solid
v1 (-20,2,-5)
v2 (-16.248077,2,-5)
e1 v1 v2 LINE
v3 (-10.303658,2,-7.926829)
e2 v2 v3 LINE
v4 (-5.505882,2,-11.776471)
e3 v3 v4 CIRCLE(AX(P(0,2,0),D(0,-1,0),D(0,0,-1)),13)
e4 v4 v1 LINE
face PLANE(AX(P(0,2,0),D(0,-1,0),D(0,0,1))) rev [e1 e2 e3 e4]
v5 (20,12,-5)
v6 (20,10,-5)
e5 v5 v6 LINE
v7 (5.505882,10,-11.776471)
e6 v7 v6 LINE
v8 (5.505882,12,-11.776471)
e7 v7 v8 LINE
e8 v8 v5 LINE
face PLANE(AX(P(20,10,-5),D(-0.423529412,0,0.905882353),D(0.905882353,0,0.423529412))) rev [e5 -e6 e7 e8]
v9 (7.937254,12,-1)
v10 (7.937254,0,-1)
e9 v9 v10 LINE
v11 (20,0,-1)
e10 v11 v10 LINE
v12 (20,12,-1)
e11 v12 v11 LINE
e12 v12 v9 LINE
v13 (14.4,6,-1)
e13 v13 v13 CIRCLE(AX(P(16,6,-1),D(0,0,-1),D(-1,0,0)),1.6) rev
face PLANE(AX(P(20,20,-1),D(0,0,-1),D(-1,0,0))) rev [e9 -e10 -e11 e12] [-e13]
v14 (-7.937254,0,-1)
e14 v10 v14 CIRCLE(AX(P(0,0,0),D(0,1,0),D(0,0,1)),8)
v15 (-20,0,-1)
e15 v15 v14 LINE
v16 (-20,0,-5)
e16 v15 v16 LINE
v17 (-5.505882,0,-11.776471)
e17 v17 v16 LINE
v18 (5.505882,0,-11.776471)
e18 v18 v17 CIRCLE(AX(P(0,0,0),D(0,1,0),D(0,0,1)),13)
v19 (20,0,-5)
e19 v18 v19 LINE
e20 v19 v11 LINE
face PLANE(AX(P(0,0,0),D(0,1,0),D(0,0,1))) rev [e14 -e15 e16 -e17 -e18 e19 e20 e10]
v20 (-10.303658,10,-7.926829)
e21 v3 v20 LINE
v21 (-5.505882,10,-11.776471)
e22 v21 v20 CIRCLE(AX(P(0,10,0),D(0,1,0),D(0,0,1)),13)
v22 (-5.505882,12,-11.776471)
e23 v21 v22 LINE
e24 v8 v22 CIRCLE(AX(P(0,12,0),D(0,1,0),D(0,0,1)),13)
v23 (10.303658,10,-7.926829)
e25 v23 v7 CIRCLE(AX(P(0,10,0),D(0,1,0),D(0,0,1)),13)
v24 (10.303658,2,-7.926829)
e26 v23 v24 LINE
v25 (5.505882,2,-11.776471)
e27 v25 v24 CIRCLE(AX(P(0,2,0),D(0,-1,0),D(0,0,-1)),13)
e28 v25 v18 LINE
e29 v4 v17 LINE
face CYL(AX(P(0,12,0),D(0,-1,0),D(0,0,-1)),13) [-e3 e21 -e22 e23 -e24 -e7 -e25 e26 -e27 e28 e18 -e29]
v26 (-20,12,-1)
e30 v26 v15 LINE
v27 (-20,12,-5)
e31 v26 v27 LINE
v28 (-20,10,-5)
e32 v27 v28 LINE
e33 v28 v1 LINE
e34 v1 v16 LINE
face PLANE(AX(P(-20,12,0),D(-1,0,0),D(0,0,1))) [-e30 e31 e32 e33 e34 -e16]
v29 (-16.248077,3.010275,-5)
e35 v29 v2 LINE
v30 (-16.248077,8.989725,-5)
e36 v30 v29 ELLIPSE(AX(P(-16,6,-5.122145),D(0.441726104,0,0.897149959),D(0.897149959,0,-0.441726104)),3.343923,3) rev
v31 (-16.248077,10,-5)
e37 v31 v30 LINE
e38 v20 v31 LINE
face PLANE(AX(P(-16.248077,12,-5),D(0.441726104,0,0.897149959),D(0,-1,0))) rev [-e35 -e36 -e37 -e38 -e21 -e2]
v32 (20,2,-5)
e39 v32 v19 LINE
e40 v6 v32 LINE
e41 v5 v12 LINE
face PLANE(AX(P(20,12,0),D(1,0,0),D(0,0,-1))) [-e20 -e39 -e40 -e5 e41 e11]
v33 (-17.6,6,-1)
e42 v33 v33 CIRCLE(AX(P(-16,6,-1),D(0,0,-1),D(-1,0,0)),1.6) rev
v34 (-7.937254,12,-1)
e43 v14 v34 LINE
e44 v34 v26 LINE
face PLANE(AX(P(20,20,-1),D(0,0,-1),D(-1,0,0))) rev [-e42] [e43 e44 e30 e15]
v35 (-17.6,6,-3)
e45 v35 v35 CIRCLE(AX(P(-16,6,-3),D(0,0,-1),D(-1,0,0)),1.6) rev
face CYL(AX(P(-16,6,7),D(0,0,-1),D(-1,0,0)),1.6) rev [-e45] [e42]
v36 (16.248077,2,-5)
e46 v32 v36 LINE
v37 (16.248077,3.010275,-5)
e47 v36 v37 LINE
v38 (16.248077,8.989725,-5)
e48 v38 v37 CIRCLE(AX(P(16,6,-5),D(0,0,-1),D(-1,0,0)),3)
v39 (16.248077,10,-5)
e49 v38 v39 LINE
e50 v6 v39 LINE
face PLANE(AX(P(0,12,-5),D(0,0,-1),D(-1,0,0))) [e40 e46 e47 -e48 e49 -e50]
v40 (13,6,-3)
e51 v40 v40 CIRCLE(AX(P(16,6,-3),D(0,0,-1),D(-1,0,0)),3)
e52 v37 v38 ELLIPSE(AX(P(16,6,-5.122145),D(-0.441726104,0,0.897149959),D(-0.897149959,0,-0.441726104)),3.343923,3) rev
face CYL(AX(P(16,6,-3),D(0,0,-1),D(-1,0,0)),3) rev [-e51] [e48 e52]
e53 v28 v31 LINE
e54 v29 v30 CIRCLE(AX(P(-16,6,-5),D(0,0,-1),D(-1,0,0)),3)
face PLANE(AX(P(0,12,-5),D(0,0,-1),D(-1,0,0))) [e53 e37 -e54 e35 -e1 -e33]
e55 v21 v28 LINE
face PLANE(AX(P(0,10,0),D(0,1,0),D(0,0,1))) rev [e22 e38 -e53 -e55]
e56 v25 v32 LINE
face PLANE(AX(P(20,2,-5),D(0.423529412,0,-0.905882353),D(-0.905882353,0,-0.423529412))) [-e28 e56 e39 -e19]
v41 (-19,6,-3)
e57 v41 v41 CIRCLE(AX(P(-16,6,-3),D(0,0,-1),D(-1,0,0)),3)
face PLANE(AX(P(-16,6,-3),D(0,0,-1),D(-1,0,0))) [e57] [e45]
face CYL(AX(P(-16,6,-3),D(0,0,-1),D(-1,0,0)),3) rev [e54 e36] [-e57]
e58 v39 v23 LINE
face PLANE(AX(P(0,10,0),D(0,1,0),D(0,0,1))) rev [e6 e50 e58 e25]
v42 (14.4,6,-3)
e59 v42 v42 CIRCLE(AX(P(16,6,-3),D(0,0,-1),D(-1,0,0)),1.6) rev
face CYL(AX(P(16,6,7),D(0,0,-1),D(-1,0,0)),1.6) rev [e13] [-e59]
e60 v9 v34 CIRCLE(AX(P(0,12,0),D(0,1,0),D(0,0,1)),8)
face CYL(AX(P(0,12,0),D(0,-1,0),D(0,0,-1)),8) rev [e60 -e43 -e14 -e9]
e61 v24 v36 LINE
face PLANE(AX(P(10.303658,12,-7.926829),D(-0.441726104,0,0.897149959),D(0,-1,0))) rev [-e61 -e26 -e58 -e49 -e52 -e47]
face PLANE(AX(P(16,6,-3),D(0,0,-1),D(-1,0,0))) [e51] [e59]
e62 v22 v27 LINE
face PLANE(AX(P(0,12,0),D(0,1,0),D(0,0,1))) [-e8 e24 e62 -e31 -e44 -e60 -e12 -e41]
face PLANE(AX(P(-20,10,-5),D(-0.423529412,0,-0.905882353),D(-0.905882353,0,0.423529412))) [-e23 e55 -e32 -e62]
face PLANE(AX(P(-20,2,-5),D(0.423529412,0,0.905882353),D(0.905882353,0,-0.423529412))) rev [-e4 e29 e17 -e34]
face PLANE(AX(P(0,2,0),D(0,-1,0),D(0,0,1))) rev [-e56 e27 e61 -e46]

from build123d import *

# Parameters (mm, degrees)
BOSS_EXTRUDE1_DEPTH  = 12
SKETCH2_R            = 1.6
CUT_EXTRUDE1_DEPTH   = 12
SKETCH3_R            = 3
CUT_EXTRUDE2_DEPTH   = 2
BOSS_EXTRUDE2_DEPTH  = 2
MIRROR2_COPY_1_DEPTH = 2
SKETCH5_W            = 40
SKETCH5_H            = 1
CUT_EXTRUDE3_DEPTH   = 20


with BuildPart() as part:
    # Sketch1 → Boss-Extrude1 (new body)
    with BuildSketch(Plane(origin=(0, 0, 0), x_dir=(1, 0, 0), z_dir=(0, 1, 0))):
        with BuildLine():
            Line((13, 0), (20, 0))
            Line((20, 0), (20, 5))
            Line((20, 5), (12, 5))
            ThreePointArc((12, 5), (12.747548784, 2.549509757), (13, 0))
        make_face()
        with BuildLine():
            Line((8, 0), (13, 0))
            ThreePointArc((13, 0), (12.747548784, 2.549509757), (12, 5))
            Line((12, 5), (6.244997998, 5))
            ThreePointArc((6.244997998, 5), (7.548509256, 2.649529771), (8, 0))
        make_face()
        with BuildLine():
            ThreePointArc((-12, 5), (-12.747548784, 2.549509757), (-13, 0))
            Line((-13, 0), (-8, 0))
            ThreePointArc((-8, 0), (-7.548509256, 2.649529771), (-6.244997998, 5))
            Line((-6.244997998, 5), (-12, 5))
        make_face()
        with BuildLine():
            Line((6.244997998, 5), (12, 5))
            ThreePointArc((12, 5), (0, 13), (-12, 5))
            Line((-12, 5), (-6.244997998, 5))
            ThreePointArc((-6.244997998, 5), (0, 8), (6.244997998, 5))
        make_face()
        with BuildLine():
            Line((-20, 0), (-13, 0))
            ThreePointArc((-13, 0), (-12.747548784, 2.549509757), (-12, 5))
            Line((-12, 5), (-20, 5))
            Line((-20, 5), (-20, 0))
        make_face()
    extrude(amount=BOSS_EXTRUDE1_DEPTH)

    # Sketch2 → Cut-Extrude1 (cut)
    with BuildSketch(Plane(origin=(0, 0, -5), x_dir=(-1, 0, 0), z_dir=(0, 0, -1))):
        with Locations((16, 6)):
            Circle(SKETCH2_R)
        with Locations((-16, 6)):
            Circle(SKETCH2_R)
    extrude(amount=-CUT_EXTRUDE1_DEPTH, mode=Mode.SUBTRACT)

    # Sketch3 → Cut-Extrude2 (cut)
    with BuildSketch(Plane(origin=(0, 0, -5), x_dir=(-1, 0, 0), z_dir=(0, 0, -1))):
        with Locations((16, 6)):
            Circle(SKETCH3_R)
        with Locations((-16, 6)):
            Circle(SKETCH3_R)
    extrude(amount=-CUT_EXTRUDE2_DEPTH, mode=Mode.SUBTRACT)

    # Sketch4 → Boss-Extrude2 (add)
    with BuildSketch(Plane(origin=(0, 12, 0), x_dir=(1, 0, 0), z_dir=(0, 1, 0))):
        Polygon((-20, 5), (-5.505882353, 11.776470588), (-3.437353346, 7.352116879), (-12, 5), align=None)
    boss_extrude2 = extrude(amount=-BOSS_EXTRUDE2_DEPTH)

    # Mirror1: Boss-Extrude2 across plane
    add(boss_extrude2.mirror(Plane(origin=(0, 0, 0), x_dir=(0, 0, 1), z_dir=(1, 0, 0))))

    # Mirror2: Boss-Extrude2 across plane
    add(boss_extrude2.mirror(Plane.ZX.offset(6)))

    # Mirror2 copy 1 sketch → Mirror2 copy 1 (add)
    with BuildSketch(Plane(origin=(0, 0, 0), x_dir=(-1, 0, 0), z_dir=(0, -1, 0))):
        Polygon((-20, 5), (-5.505882353, 11.776470588), (-3.437353346, 7.352116879), (-12, 5), align=None)
    extrude(amount=-MIRROR2_COPY_1_DEPTH)

    # Chamfer1
    # the kernel refuses this chamfer: 5 mm, written as the material it adds along each edge
    with BuildSketch(Plane(origin=(-12, 2, -5), x_dir=(0.5282334615554308, 0, -0.8490991756521539), z_dir=(0, 1, 0))) as chamfer1_piece_1_section:
        with BuildLine():
            Line((3.55102746, 0), (-2.413771098, 3.712725473))
            Line((-2.413771098, 3.712725473), (-2.498681015, 3.659902127))
            ThreePointArc((-2.498681015, 3.659902127), (-1.254288539, 1.826872841), (-0.084909918, -0.052823346))
            Line((-0.084909918, -0.052823346), (0.016102351, -0.098695057))
            ThreePointArc((0.016102351, -0.098695057), (1.773886736, 0.065687387), (3.541120329, -0.099508034))
            Line((3.541120329, -0.099508034), (3.55102746, 0))
        make_face()
    chamfer1_piece_1 = extrude(amount=8, mode=Mode.PRIVATE)
    chamfer1_piece_1 = chamfer1_piece_1 - Plane(origin=(-16, 6, -6.086552006), x_dir=(-1, 0, 0), z_dir=(0, 0, -1)) * Cylinder(3, 31, mode=Mode.PRIVATE)
    add(chamfer1_piece_1)
    with BuildSketch(Plane(origin=(12, 2, -5), x_dir=(0.9998009840016291, 0, 0.01994974659924107), z_dir=(0, 1, 0))) as chamfer1_piece_2_section:
        with BuildLine():
            Line((4.428388121, 0), (-1.935550186, 2.977153255))
            Line((-1.935550186, 2.977153255), (-2.013576875, 2.914608585))
            ThreePointArc((-2.013576875, 2.914608585), (-0.911816487, 1.523016637), (-0.091522024, -0.040295399))
            Line((-0.091522024, -0.040295399), (0.001994975, -0.099980098))
            ThreePointArc((0.001994975, -0.099980098), (2.215307803, -0.055816279), (4.430383096, -0.099980098))
            Line((4.430383096, -0.099980098), (4.428388121, 0))
        make_face()
    chamfer1_piece_2 = extrude(amount=8, mode=Mode.PRIVATE)
    chamfer1_piece_2 = chamfer1_piece_2 - Plane(origin=(16, 6, -6.086550713), x_dir=(-1, 0, 0), z_dir=(0, 0, -1)) * Cylinder(3, 34, mode=Mode.PRIVATE)
    add(chamfer1_piece_2)

    # Sketch5 → Cut-Extrude3 (cut)
    with BuildSketch(Plane.XZ):
        with Locations((0, -0.5)):
            Rectangle(SKETCH5_W, SKETCH5_H)
    extrude(amount=-CUT_EXTRUDE3_DEPTH, mode=Mode.SUBTRACT)


solid = part.part
